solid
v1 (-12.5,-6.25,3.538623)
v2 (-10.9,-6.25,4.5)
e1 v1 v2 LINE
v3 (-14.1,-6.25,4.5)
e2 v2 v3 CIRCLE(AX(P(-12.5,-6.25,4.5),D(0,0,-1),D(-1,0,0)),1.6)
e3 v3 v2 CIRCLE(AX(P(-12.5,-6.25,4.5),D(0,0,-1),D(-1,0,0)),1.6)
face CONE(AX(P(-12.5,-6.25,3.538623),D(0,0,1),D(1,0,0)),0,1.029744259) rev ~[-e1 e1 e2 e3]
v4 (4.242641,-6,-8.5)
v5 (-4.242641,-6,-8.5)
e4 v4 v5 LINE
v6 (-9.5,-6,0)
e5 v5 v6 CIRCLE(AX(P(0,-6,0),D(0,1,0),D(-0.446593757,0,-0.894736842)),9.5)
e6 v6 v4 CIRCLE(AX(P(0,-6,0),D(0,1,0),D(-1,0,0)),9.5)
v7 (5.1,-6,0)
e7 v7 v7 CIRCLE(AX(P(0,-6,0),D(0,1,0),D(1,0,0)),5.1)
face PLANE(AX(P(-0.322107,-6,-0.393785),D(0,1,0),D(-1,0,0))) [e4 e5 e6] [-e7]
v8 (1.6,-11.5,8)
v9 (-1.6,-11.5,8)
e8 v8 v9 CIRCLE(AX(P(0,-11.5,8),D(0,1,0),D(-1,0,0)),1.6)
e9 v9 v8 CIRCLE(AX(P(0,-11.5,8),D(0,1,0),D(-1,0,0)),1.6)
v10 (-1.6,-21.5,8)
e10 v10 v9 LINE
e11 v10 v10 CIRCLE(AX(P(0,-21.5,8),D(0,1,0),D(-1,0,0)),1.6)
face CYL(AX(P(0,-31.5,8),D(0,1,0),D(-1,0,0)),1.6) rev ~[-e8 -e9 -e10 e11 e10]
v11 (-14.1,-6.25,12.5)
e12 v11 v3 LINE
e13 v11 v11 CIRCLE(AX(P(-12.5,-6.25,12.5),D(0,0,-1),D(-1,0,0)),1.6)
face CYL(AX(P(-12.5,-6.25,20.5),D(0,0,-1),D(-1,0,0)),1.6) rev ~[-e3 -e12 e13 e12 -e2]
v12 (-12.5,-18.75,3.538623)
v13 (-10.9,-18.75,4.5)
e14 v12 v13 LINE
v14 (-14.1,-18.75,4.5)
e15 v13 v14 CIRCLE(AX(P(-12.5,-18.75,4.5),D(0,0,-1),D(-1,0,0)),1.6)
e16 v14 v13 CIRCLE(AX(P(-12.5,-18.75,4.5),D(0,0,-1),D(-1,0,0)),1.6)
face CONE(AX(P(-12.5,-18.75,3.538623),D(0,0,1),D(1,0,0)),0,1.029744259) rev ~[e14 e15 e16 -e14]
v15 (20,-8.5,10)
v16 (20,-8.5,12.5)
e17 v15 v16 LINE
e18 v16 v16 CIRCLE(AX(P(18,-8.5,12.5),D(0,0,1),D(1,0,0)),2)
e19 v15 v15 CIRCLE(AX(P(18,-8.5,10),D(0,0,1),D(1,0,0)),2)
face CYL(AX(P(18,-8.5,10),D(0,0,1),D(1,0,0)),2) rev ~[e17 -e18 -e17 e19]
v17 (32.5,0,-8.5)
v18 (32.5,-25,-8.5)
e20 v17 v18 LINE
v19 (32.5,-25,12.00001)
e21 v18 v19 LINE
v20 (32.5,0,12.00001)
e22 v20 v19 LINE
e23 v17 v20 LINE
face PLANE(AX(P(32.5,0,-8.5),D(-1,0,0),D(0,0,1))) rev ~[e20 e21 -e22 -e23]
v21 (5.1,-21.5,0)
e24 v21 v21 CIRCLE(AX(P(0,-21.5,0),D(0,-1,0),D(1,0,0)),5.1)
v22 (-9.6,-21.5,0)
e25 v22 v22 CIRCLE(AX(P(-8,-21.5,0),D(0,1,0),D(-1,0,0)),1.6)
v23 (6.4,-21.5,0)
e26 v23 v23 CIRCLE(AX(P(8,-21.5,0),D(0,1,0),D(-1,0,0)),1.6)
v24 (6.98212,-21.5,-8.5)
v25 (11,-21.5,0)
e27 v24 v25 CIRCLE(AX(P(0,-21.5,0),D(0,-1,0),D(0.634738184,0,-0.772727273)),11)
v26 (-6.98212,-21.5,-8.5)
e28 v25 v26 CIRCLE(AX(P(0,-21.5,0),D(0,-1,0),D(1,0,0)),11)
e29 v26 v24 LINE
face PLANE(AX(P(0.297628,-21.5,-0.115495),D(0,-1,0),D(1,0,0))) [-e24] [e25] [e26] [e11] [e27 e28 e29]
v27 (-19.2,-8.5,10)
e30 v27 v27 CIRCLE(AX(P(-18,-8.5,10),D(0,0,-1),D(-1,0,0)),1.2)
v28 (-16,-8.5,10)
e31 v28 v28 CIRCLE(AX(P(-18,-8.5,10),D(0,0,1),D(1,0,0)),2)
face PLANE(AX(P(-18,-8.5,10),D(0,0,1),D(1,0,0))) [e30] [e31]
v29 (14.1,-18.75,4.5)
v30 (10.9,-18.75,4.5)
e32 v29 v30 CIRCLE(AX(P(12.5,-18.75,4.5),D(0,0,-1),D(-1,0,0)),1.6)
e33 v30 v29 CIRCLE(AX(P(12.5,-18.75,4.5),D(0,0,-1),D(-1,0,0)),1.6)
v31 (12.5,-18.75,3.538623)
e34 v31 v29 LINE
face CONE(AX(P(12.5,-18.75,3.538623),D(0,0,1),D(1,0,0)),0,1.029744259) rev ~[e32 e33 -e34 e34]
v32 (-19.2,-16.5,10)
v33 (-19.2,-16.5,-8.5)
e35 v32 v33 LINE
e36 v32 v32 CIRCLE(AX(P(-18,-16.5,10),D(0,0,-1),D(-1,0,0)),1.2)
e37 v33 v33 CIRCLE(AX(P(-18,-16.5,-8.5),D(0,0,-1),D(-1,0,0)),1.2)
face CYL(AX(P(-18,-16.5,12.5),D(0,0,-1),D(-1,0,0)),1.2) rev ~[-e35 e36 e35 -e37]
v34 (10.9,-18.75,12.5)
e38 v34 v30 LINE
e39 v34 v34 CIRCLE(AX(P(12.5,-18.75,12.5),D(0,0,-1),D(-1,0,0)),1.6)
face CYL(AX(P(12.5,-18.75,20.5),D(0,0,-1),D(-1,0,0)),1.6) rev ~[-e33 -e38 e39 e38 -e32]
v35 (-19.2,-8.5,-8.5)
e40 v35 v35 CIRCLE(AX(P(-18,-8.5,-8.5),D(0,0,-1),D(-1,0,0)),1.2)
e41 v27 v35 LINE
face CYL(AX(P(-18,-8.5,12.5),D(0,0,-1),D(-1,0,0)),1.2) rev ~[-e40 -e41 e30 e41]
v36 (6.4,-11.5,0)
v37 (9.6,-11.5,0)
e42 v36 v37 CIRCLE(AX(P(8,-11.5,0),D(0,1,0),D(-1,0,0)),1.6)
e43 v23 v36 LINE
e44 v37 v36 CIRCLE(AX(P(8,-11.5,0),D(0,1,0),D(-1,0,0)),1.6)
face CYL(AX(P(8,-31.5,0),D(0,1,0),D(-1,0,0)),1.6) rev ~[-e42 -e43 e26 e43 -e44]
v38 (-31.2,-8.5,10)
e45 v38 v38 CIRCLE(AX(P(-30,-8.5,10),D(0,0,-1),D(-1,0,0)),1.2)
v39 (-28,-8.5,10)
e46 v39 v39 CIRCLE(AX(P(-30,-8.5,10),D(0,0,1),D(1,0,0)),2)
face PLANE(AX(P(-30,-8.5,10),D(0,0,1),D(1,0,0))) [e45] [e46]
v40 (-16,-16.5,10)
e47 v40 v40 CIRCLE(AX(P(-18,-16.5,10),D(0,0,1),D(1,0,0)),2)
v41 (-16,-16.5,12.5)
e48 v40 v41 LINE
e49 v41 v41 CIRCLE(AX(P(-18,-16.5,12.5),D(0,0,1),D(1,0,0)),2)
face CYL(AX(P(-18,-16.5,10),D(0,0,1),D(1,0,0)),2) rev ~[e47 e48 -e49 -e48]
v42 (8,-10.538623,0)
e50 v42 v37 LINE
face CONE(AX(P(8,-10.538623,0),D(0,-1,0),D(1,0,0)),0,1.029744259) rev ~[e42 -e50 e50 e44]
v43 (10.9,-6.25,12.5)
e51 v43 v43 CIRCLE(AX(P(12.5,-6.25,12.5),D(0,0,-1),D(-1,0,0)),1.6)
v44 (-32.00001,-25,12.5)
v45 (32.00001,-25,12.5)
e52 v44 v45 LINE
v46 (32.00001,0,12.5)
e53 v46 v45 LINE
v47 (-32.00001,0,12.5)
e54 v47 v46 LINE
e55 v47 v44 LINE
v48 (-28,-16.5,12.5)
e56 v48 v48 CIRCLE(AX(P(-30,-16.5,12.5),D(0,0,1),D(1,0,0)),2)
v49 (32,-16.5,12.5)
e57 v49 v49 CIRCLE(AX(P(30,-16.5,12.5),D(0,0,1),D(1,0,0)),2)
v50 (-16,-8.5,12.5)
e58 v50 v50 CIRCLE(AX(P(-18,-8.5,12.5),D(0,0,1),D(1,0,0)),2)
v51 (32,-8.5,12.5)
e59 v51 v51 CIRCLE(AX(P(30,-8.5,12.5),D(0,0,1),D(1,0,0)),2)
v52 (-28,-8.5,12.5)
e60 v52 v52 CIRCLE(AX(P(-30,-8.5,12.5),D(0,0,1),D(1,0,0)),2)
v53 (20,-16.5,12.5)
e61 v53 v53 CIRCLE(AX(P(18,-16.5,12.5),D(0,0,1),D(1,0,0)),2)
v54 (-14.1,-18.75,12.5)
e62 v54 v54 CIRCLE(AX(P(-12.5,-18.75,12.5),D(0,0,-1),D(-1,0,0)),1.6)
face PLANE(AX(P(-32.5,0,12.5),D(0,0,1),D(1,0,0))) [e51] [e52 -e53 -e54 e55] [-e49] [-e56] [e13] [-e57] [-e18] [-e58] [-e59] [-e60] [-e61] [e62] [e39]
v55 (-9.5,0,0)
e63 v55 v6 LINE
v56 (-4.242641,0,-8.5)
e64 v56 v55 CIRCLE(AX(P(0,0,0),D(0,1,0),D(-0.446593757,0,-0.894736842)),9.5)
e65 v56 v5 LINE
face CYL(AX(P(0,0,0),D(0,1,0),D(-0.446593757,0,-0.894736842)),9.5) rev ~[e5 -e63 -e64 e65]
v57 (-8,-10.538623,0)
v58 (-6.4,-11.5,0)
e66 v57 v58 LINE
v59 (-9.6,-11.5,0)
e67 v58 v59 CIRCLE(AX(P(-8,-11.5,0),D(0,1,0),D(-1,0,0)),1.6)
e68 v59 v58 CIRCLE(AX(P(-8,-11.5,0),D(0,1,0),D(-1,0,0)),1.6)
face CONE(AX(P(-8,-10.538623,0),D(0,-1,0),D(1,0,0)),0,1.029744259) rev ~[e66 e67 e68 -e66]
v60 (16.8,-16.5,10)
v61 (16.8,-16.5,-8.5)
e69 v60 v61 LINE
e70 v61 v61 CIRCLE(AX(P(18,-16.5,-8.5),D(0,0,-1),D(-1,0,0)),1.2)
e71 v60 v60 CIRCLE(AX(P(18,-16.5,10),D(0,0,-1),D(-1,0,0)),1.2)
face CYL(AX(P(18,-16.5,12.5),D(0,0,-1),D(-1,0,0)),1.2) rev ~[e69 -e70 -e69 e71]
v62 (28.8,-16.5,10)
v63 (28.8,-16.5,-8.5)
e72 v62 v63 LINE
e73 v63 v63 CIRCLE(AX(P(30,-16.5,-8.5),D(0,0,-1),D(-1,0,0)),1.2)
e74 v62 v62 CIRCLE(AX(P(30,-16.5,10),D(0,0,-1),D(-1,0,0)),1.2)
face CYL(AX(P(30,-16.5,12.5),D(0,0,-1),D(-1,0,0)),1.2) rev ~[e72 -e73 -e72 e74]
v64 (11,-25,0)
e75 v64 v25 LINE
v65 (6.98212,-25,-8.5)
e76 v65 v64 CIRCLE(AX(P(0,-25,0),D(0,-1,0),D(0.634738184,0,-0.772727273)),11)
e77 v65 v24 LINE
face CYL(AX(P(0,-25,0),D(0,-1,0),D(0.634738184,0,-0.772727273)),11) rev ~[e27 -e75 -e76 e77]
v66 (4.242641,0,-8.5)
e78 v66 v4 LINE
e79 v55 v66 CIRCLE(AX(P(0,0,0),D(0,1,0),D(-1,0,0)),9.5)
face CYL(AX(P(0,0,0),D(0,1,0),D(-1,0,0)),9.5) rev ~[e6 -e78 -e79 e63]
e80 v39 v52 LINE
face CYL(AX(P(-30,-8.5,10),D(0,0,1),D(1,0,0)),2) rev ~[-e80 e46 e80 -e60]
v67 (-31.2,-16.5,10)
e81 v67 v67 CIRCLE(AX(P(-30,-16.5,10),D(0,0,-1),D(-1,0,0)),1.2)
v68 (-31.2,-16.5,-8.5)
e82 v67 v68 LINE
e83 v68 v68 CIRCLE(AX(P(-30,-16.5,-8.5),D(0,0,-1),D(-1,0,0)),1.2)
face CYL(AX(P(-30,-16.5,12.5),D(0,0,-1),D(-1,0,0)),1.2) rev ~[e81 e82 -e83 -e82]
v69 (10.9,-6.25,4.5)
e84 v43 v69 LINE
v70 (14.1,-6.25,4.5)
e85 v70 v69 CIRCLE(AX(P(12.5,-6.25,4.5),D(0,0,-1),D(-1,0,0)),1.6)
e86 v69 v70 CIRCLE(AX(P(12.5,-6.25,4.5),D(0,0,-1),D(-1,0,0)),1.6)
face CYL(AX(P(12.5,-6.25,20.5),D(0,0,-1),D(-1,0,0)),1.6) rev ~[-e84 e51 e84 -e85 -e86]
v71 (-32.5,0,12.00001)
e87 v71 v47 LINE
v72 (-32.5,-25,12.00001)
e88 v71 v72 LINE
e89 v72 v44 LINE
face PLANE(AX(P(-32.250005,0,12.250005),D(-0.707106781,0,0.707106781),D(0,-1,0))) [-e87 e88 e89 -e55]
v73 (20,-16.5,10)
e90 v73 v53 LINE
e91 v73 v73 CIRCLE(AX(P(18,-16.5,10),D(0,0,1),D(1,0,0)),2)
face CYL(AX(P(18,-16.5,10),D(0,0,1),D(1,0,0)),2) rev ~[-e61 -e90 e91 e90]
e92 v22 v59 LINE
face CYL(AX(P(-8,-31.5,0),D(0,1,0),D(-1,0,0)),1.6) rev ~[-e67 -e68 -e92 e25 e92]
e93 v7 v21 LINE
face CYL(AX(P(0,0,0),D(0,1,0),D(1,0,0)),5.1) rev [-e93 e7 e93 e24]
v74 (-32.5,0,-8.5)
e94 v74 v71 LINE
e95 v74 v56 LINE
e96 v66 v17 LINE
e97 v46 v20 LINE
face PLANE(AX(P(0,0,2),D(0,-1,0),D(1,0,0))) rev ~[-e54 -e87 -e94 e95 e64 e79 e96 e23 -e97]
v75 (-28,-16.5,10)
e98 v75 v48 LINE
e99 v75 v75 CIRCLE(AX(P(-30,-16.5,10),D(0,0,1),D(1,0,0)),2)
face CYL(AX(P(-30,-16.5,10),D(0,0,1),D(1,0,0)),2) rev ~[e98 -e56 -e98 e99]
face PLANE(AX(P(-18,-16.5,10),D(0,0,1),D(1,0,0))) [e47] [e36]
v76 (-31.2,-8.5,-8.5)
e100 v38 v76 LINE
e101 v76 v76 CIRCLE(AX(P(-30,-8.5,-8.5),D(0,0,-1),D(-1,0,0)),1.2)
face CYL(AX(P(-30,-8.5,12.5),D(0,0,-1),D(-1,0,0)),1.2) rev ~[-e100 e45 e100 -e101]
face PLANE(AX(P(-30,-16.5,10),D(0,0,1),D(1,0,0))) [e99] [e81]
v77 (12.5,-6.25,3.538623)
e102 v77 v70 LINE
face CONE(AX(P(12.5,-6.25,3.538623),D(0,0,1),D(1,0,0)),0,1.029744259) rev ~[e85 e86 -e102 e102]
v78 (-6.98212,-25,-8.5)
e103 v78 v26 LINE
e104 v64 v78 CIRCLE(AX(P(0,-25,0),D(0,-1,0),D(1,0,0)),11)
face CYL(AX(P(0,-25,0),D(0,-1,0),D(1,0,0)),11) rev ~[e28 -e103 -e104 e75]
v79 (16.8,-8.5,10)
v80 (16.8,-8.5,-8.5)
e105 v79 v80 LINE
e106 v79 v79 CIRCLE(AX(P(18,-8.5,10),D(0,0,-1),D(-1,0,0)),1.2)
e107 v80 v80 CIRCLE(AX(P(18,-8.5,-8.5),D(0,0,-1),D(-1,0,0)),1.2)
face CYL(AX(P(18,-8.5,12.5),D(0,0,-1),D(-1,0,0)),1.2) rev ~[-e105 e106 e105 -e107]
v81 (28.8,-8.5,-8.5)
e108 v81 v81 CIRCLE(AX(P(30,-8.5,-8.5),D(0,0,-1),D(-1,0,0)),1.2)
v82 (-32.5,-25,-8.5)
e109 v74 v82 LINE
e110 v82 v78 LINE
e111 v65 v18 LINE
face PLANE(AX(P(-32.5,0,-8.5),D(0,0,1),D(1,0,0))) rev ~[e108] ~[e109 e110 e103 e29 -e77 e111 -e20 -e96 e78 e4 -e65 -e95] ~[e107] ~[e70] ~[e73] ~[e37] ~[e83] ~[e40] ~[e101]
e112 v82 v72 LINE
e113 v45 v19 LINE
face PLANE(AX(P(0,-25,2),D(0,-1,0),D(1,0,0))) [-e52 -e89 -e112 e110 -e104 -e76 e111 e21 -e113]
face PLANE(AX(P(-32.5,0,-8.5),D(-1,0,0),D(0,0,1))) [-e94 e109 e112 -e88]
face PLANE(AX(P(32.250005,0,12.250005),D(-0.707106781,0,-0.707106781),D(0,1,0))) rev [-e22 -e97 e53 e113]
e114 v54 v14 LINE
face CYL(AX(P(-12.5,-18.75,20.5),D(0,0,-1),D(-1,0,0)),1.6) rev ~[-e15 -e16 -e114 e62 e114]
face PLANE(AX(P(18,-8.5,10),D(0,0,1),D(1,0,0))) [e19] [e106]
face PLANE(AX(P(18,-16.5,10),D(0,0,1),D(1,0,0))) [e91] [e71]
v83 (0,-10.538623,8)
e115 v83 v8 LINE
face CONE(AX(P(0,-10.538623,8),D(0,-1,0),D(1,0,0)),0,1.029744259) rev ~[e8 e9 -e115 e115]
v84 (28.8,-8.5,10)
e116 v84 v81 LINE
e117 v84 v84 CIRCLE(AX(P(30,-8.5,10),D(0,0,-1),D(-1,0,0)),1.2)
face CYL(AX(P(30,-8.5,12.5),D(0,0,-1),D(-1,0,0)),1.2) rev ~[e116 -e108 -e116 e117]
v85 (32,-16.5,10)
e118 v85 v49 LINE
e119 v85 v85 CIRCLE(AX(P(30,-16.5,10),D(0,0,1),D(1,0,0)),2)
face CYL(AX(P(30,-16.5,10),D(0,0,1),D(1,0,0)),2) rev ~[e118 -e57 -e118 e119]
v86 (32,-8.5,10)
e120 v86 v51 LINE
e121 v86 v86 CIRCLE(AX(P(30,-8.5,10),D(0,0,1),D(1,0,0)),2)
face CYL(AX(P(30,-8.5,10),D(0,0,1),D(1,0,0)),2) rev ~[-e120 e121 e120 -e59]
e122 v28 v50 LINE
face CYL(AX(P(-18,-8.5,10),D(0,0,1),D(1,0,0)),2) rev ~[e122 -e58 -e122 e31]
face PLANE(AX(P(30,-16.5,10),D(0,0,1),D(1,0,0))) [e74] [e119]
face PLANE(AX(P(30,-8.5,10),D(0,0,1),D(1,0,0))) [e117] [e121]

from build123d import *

# Parameters (mm, degrees)
F0_W           = 65
F0_H           = 21
F0_R           = 5.1
F1_DEPTH       = 25
F3_D           = 2.4
F3_CBORE_D     = 4
F3_CBORE_DEPTH = 2.5
F4_SIZE        = 0.49999
F5_R           = 5.1
F6_DEPTH       = 3.5
F8_D           = 3.2
F8_DEPTH       = 8
F8_TIP         = 0.9613769904
F10_D          = 3.2
F10_DEPTH      = 10
F10_TIP        = 0.9613769904
F11_R          = 5.1
F12_DEPTH      = 6


# Not quite as in the source:
# - a fillet or chamfer is up to 0.001 mm smaller than in the source, because OpenCascade refuses the exact size


with BuildPart() as f1:
    # F0 (on Front) → F1 (new body)
    with BuildSketch(Plane.XZ):
        with Locations((0, 2)):
            Rectangle(F0_W, F0_H)
        Circle(F0_R, mode=Mode.SUBTRACT)
    extrude(amount=F1_DEPTH)

    # F3 (through all)
    with Locations(Plane.XY.offset(12.5)):
        with Locations((-30, -8.5), (-30, -16.5), (-18, -8.5), (-18, -16.5), (18, -16.5), (18, -8.5), (30, -8.5), (30, -16.5)):
            CounterBoreHole(F3_D / 2, F3_CBORE_D / 2, F3_CBORE_DEPTH)

    # F4 (size 0.5 in the source; OpenCascade refuses exactly that, so slightly less here)
    f4_edges = [f1.edges().sort_by_distance(p)[0] for p in [
        (-32.5, -12.5, 12.5),
        (32.5, -12.5, 12.5),
    ]]
    chamfer(f4_edges, length=F4_SIZE)

    # F5 (on face) → F6 (cut)
    with BuildSketch(Plane.XZ.offset(25)):
        with BuildLine():
            ThreePointArc((6.9821200219, -8.5), (9.9449313784, -4.7008871375), (11, 0))
            ThreePointArc((11, 0), (-4.7008871375, 9.9449313784), (-6.9821200219, -8.5))
            Line((-6.9821200219, -8.5), (6.9821200219, -8.5))
        make_face()
        Circle(F5_R, mode=Mode.SUBTRACT)
    extrude(amount=-F6_DEPTH, mode=Mode.SUBTRACT)

    # F8
    with Locations(Plane.XY.offset(12.5)):
        with Locations((12.5, -6.25), (12.5, -18.75), (-12.5, -6.25), (-12.5, -18.75)):
            Hole(F8_D / 2, depth=F8_DEPTH)
            with Locations((0, 0, -(F8_DEPTH + F8_TIP / 2))):  # 118° drill point
                Cone(0, F8_D / 2, F8_TIP, mode=Mode.SUBTRACT)

    # F10
    with Locations(Plane.XZ.offset(21.5)):
        with Locations((-8, 0), (0, 8), (8, 0)):
            Hole(F10_D / 2, depth=F10_DEPTH)
            with Locations((0, 0, -(F10_DEPTH + F10_TIP / 2))):  # 118° drill point
                Cone(0, F10_D / 2, F10_TIP, mode=Mode.SUBTRACT)

    # F11 (on face) → F12 (cut)
    with BuildSketch(Plane(origin=(0, 0, 0), x_dir=(-1, 0, 0), z_dir=(0, 1, 0))):
        with BuildLine():
            ThreePointArc((4.2426406871, -8.5), (8.0794519161, -4.9972449146), (9.5, 0))
            ThreePointArc((9.5, 0), (-4.9972449146, 8.0794519161), (-4.2426406871, -8.5))
            Line((-4.2426406871, -8.5), (4.2426406871, -8.5))
        make_face()
        Circle(F11_R, mode=Mode.SUBTRACT)
        Circle(F11_R)
    extrude(amount=-F12_DEPTH, mode=Mode.SUBTRACT)


solid = f1.part
